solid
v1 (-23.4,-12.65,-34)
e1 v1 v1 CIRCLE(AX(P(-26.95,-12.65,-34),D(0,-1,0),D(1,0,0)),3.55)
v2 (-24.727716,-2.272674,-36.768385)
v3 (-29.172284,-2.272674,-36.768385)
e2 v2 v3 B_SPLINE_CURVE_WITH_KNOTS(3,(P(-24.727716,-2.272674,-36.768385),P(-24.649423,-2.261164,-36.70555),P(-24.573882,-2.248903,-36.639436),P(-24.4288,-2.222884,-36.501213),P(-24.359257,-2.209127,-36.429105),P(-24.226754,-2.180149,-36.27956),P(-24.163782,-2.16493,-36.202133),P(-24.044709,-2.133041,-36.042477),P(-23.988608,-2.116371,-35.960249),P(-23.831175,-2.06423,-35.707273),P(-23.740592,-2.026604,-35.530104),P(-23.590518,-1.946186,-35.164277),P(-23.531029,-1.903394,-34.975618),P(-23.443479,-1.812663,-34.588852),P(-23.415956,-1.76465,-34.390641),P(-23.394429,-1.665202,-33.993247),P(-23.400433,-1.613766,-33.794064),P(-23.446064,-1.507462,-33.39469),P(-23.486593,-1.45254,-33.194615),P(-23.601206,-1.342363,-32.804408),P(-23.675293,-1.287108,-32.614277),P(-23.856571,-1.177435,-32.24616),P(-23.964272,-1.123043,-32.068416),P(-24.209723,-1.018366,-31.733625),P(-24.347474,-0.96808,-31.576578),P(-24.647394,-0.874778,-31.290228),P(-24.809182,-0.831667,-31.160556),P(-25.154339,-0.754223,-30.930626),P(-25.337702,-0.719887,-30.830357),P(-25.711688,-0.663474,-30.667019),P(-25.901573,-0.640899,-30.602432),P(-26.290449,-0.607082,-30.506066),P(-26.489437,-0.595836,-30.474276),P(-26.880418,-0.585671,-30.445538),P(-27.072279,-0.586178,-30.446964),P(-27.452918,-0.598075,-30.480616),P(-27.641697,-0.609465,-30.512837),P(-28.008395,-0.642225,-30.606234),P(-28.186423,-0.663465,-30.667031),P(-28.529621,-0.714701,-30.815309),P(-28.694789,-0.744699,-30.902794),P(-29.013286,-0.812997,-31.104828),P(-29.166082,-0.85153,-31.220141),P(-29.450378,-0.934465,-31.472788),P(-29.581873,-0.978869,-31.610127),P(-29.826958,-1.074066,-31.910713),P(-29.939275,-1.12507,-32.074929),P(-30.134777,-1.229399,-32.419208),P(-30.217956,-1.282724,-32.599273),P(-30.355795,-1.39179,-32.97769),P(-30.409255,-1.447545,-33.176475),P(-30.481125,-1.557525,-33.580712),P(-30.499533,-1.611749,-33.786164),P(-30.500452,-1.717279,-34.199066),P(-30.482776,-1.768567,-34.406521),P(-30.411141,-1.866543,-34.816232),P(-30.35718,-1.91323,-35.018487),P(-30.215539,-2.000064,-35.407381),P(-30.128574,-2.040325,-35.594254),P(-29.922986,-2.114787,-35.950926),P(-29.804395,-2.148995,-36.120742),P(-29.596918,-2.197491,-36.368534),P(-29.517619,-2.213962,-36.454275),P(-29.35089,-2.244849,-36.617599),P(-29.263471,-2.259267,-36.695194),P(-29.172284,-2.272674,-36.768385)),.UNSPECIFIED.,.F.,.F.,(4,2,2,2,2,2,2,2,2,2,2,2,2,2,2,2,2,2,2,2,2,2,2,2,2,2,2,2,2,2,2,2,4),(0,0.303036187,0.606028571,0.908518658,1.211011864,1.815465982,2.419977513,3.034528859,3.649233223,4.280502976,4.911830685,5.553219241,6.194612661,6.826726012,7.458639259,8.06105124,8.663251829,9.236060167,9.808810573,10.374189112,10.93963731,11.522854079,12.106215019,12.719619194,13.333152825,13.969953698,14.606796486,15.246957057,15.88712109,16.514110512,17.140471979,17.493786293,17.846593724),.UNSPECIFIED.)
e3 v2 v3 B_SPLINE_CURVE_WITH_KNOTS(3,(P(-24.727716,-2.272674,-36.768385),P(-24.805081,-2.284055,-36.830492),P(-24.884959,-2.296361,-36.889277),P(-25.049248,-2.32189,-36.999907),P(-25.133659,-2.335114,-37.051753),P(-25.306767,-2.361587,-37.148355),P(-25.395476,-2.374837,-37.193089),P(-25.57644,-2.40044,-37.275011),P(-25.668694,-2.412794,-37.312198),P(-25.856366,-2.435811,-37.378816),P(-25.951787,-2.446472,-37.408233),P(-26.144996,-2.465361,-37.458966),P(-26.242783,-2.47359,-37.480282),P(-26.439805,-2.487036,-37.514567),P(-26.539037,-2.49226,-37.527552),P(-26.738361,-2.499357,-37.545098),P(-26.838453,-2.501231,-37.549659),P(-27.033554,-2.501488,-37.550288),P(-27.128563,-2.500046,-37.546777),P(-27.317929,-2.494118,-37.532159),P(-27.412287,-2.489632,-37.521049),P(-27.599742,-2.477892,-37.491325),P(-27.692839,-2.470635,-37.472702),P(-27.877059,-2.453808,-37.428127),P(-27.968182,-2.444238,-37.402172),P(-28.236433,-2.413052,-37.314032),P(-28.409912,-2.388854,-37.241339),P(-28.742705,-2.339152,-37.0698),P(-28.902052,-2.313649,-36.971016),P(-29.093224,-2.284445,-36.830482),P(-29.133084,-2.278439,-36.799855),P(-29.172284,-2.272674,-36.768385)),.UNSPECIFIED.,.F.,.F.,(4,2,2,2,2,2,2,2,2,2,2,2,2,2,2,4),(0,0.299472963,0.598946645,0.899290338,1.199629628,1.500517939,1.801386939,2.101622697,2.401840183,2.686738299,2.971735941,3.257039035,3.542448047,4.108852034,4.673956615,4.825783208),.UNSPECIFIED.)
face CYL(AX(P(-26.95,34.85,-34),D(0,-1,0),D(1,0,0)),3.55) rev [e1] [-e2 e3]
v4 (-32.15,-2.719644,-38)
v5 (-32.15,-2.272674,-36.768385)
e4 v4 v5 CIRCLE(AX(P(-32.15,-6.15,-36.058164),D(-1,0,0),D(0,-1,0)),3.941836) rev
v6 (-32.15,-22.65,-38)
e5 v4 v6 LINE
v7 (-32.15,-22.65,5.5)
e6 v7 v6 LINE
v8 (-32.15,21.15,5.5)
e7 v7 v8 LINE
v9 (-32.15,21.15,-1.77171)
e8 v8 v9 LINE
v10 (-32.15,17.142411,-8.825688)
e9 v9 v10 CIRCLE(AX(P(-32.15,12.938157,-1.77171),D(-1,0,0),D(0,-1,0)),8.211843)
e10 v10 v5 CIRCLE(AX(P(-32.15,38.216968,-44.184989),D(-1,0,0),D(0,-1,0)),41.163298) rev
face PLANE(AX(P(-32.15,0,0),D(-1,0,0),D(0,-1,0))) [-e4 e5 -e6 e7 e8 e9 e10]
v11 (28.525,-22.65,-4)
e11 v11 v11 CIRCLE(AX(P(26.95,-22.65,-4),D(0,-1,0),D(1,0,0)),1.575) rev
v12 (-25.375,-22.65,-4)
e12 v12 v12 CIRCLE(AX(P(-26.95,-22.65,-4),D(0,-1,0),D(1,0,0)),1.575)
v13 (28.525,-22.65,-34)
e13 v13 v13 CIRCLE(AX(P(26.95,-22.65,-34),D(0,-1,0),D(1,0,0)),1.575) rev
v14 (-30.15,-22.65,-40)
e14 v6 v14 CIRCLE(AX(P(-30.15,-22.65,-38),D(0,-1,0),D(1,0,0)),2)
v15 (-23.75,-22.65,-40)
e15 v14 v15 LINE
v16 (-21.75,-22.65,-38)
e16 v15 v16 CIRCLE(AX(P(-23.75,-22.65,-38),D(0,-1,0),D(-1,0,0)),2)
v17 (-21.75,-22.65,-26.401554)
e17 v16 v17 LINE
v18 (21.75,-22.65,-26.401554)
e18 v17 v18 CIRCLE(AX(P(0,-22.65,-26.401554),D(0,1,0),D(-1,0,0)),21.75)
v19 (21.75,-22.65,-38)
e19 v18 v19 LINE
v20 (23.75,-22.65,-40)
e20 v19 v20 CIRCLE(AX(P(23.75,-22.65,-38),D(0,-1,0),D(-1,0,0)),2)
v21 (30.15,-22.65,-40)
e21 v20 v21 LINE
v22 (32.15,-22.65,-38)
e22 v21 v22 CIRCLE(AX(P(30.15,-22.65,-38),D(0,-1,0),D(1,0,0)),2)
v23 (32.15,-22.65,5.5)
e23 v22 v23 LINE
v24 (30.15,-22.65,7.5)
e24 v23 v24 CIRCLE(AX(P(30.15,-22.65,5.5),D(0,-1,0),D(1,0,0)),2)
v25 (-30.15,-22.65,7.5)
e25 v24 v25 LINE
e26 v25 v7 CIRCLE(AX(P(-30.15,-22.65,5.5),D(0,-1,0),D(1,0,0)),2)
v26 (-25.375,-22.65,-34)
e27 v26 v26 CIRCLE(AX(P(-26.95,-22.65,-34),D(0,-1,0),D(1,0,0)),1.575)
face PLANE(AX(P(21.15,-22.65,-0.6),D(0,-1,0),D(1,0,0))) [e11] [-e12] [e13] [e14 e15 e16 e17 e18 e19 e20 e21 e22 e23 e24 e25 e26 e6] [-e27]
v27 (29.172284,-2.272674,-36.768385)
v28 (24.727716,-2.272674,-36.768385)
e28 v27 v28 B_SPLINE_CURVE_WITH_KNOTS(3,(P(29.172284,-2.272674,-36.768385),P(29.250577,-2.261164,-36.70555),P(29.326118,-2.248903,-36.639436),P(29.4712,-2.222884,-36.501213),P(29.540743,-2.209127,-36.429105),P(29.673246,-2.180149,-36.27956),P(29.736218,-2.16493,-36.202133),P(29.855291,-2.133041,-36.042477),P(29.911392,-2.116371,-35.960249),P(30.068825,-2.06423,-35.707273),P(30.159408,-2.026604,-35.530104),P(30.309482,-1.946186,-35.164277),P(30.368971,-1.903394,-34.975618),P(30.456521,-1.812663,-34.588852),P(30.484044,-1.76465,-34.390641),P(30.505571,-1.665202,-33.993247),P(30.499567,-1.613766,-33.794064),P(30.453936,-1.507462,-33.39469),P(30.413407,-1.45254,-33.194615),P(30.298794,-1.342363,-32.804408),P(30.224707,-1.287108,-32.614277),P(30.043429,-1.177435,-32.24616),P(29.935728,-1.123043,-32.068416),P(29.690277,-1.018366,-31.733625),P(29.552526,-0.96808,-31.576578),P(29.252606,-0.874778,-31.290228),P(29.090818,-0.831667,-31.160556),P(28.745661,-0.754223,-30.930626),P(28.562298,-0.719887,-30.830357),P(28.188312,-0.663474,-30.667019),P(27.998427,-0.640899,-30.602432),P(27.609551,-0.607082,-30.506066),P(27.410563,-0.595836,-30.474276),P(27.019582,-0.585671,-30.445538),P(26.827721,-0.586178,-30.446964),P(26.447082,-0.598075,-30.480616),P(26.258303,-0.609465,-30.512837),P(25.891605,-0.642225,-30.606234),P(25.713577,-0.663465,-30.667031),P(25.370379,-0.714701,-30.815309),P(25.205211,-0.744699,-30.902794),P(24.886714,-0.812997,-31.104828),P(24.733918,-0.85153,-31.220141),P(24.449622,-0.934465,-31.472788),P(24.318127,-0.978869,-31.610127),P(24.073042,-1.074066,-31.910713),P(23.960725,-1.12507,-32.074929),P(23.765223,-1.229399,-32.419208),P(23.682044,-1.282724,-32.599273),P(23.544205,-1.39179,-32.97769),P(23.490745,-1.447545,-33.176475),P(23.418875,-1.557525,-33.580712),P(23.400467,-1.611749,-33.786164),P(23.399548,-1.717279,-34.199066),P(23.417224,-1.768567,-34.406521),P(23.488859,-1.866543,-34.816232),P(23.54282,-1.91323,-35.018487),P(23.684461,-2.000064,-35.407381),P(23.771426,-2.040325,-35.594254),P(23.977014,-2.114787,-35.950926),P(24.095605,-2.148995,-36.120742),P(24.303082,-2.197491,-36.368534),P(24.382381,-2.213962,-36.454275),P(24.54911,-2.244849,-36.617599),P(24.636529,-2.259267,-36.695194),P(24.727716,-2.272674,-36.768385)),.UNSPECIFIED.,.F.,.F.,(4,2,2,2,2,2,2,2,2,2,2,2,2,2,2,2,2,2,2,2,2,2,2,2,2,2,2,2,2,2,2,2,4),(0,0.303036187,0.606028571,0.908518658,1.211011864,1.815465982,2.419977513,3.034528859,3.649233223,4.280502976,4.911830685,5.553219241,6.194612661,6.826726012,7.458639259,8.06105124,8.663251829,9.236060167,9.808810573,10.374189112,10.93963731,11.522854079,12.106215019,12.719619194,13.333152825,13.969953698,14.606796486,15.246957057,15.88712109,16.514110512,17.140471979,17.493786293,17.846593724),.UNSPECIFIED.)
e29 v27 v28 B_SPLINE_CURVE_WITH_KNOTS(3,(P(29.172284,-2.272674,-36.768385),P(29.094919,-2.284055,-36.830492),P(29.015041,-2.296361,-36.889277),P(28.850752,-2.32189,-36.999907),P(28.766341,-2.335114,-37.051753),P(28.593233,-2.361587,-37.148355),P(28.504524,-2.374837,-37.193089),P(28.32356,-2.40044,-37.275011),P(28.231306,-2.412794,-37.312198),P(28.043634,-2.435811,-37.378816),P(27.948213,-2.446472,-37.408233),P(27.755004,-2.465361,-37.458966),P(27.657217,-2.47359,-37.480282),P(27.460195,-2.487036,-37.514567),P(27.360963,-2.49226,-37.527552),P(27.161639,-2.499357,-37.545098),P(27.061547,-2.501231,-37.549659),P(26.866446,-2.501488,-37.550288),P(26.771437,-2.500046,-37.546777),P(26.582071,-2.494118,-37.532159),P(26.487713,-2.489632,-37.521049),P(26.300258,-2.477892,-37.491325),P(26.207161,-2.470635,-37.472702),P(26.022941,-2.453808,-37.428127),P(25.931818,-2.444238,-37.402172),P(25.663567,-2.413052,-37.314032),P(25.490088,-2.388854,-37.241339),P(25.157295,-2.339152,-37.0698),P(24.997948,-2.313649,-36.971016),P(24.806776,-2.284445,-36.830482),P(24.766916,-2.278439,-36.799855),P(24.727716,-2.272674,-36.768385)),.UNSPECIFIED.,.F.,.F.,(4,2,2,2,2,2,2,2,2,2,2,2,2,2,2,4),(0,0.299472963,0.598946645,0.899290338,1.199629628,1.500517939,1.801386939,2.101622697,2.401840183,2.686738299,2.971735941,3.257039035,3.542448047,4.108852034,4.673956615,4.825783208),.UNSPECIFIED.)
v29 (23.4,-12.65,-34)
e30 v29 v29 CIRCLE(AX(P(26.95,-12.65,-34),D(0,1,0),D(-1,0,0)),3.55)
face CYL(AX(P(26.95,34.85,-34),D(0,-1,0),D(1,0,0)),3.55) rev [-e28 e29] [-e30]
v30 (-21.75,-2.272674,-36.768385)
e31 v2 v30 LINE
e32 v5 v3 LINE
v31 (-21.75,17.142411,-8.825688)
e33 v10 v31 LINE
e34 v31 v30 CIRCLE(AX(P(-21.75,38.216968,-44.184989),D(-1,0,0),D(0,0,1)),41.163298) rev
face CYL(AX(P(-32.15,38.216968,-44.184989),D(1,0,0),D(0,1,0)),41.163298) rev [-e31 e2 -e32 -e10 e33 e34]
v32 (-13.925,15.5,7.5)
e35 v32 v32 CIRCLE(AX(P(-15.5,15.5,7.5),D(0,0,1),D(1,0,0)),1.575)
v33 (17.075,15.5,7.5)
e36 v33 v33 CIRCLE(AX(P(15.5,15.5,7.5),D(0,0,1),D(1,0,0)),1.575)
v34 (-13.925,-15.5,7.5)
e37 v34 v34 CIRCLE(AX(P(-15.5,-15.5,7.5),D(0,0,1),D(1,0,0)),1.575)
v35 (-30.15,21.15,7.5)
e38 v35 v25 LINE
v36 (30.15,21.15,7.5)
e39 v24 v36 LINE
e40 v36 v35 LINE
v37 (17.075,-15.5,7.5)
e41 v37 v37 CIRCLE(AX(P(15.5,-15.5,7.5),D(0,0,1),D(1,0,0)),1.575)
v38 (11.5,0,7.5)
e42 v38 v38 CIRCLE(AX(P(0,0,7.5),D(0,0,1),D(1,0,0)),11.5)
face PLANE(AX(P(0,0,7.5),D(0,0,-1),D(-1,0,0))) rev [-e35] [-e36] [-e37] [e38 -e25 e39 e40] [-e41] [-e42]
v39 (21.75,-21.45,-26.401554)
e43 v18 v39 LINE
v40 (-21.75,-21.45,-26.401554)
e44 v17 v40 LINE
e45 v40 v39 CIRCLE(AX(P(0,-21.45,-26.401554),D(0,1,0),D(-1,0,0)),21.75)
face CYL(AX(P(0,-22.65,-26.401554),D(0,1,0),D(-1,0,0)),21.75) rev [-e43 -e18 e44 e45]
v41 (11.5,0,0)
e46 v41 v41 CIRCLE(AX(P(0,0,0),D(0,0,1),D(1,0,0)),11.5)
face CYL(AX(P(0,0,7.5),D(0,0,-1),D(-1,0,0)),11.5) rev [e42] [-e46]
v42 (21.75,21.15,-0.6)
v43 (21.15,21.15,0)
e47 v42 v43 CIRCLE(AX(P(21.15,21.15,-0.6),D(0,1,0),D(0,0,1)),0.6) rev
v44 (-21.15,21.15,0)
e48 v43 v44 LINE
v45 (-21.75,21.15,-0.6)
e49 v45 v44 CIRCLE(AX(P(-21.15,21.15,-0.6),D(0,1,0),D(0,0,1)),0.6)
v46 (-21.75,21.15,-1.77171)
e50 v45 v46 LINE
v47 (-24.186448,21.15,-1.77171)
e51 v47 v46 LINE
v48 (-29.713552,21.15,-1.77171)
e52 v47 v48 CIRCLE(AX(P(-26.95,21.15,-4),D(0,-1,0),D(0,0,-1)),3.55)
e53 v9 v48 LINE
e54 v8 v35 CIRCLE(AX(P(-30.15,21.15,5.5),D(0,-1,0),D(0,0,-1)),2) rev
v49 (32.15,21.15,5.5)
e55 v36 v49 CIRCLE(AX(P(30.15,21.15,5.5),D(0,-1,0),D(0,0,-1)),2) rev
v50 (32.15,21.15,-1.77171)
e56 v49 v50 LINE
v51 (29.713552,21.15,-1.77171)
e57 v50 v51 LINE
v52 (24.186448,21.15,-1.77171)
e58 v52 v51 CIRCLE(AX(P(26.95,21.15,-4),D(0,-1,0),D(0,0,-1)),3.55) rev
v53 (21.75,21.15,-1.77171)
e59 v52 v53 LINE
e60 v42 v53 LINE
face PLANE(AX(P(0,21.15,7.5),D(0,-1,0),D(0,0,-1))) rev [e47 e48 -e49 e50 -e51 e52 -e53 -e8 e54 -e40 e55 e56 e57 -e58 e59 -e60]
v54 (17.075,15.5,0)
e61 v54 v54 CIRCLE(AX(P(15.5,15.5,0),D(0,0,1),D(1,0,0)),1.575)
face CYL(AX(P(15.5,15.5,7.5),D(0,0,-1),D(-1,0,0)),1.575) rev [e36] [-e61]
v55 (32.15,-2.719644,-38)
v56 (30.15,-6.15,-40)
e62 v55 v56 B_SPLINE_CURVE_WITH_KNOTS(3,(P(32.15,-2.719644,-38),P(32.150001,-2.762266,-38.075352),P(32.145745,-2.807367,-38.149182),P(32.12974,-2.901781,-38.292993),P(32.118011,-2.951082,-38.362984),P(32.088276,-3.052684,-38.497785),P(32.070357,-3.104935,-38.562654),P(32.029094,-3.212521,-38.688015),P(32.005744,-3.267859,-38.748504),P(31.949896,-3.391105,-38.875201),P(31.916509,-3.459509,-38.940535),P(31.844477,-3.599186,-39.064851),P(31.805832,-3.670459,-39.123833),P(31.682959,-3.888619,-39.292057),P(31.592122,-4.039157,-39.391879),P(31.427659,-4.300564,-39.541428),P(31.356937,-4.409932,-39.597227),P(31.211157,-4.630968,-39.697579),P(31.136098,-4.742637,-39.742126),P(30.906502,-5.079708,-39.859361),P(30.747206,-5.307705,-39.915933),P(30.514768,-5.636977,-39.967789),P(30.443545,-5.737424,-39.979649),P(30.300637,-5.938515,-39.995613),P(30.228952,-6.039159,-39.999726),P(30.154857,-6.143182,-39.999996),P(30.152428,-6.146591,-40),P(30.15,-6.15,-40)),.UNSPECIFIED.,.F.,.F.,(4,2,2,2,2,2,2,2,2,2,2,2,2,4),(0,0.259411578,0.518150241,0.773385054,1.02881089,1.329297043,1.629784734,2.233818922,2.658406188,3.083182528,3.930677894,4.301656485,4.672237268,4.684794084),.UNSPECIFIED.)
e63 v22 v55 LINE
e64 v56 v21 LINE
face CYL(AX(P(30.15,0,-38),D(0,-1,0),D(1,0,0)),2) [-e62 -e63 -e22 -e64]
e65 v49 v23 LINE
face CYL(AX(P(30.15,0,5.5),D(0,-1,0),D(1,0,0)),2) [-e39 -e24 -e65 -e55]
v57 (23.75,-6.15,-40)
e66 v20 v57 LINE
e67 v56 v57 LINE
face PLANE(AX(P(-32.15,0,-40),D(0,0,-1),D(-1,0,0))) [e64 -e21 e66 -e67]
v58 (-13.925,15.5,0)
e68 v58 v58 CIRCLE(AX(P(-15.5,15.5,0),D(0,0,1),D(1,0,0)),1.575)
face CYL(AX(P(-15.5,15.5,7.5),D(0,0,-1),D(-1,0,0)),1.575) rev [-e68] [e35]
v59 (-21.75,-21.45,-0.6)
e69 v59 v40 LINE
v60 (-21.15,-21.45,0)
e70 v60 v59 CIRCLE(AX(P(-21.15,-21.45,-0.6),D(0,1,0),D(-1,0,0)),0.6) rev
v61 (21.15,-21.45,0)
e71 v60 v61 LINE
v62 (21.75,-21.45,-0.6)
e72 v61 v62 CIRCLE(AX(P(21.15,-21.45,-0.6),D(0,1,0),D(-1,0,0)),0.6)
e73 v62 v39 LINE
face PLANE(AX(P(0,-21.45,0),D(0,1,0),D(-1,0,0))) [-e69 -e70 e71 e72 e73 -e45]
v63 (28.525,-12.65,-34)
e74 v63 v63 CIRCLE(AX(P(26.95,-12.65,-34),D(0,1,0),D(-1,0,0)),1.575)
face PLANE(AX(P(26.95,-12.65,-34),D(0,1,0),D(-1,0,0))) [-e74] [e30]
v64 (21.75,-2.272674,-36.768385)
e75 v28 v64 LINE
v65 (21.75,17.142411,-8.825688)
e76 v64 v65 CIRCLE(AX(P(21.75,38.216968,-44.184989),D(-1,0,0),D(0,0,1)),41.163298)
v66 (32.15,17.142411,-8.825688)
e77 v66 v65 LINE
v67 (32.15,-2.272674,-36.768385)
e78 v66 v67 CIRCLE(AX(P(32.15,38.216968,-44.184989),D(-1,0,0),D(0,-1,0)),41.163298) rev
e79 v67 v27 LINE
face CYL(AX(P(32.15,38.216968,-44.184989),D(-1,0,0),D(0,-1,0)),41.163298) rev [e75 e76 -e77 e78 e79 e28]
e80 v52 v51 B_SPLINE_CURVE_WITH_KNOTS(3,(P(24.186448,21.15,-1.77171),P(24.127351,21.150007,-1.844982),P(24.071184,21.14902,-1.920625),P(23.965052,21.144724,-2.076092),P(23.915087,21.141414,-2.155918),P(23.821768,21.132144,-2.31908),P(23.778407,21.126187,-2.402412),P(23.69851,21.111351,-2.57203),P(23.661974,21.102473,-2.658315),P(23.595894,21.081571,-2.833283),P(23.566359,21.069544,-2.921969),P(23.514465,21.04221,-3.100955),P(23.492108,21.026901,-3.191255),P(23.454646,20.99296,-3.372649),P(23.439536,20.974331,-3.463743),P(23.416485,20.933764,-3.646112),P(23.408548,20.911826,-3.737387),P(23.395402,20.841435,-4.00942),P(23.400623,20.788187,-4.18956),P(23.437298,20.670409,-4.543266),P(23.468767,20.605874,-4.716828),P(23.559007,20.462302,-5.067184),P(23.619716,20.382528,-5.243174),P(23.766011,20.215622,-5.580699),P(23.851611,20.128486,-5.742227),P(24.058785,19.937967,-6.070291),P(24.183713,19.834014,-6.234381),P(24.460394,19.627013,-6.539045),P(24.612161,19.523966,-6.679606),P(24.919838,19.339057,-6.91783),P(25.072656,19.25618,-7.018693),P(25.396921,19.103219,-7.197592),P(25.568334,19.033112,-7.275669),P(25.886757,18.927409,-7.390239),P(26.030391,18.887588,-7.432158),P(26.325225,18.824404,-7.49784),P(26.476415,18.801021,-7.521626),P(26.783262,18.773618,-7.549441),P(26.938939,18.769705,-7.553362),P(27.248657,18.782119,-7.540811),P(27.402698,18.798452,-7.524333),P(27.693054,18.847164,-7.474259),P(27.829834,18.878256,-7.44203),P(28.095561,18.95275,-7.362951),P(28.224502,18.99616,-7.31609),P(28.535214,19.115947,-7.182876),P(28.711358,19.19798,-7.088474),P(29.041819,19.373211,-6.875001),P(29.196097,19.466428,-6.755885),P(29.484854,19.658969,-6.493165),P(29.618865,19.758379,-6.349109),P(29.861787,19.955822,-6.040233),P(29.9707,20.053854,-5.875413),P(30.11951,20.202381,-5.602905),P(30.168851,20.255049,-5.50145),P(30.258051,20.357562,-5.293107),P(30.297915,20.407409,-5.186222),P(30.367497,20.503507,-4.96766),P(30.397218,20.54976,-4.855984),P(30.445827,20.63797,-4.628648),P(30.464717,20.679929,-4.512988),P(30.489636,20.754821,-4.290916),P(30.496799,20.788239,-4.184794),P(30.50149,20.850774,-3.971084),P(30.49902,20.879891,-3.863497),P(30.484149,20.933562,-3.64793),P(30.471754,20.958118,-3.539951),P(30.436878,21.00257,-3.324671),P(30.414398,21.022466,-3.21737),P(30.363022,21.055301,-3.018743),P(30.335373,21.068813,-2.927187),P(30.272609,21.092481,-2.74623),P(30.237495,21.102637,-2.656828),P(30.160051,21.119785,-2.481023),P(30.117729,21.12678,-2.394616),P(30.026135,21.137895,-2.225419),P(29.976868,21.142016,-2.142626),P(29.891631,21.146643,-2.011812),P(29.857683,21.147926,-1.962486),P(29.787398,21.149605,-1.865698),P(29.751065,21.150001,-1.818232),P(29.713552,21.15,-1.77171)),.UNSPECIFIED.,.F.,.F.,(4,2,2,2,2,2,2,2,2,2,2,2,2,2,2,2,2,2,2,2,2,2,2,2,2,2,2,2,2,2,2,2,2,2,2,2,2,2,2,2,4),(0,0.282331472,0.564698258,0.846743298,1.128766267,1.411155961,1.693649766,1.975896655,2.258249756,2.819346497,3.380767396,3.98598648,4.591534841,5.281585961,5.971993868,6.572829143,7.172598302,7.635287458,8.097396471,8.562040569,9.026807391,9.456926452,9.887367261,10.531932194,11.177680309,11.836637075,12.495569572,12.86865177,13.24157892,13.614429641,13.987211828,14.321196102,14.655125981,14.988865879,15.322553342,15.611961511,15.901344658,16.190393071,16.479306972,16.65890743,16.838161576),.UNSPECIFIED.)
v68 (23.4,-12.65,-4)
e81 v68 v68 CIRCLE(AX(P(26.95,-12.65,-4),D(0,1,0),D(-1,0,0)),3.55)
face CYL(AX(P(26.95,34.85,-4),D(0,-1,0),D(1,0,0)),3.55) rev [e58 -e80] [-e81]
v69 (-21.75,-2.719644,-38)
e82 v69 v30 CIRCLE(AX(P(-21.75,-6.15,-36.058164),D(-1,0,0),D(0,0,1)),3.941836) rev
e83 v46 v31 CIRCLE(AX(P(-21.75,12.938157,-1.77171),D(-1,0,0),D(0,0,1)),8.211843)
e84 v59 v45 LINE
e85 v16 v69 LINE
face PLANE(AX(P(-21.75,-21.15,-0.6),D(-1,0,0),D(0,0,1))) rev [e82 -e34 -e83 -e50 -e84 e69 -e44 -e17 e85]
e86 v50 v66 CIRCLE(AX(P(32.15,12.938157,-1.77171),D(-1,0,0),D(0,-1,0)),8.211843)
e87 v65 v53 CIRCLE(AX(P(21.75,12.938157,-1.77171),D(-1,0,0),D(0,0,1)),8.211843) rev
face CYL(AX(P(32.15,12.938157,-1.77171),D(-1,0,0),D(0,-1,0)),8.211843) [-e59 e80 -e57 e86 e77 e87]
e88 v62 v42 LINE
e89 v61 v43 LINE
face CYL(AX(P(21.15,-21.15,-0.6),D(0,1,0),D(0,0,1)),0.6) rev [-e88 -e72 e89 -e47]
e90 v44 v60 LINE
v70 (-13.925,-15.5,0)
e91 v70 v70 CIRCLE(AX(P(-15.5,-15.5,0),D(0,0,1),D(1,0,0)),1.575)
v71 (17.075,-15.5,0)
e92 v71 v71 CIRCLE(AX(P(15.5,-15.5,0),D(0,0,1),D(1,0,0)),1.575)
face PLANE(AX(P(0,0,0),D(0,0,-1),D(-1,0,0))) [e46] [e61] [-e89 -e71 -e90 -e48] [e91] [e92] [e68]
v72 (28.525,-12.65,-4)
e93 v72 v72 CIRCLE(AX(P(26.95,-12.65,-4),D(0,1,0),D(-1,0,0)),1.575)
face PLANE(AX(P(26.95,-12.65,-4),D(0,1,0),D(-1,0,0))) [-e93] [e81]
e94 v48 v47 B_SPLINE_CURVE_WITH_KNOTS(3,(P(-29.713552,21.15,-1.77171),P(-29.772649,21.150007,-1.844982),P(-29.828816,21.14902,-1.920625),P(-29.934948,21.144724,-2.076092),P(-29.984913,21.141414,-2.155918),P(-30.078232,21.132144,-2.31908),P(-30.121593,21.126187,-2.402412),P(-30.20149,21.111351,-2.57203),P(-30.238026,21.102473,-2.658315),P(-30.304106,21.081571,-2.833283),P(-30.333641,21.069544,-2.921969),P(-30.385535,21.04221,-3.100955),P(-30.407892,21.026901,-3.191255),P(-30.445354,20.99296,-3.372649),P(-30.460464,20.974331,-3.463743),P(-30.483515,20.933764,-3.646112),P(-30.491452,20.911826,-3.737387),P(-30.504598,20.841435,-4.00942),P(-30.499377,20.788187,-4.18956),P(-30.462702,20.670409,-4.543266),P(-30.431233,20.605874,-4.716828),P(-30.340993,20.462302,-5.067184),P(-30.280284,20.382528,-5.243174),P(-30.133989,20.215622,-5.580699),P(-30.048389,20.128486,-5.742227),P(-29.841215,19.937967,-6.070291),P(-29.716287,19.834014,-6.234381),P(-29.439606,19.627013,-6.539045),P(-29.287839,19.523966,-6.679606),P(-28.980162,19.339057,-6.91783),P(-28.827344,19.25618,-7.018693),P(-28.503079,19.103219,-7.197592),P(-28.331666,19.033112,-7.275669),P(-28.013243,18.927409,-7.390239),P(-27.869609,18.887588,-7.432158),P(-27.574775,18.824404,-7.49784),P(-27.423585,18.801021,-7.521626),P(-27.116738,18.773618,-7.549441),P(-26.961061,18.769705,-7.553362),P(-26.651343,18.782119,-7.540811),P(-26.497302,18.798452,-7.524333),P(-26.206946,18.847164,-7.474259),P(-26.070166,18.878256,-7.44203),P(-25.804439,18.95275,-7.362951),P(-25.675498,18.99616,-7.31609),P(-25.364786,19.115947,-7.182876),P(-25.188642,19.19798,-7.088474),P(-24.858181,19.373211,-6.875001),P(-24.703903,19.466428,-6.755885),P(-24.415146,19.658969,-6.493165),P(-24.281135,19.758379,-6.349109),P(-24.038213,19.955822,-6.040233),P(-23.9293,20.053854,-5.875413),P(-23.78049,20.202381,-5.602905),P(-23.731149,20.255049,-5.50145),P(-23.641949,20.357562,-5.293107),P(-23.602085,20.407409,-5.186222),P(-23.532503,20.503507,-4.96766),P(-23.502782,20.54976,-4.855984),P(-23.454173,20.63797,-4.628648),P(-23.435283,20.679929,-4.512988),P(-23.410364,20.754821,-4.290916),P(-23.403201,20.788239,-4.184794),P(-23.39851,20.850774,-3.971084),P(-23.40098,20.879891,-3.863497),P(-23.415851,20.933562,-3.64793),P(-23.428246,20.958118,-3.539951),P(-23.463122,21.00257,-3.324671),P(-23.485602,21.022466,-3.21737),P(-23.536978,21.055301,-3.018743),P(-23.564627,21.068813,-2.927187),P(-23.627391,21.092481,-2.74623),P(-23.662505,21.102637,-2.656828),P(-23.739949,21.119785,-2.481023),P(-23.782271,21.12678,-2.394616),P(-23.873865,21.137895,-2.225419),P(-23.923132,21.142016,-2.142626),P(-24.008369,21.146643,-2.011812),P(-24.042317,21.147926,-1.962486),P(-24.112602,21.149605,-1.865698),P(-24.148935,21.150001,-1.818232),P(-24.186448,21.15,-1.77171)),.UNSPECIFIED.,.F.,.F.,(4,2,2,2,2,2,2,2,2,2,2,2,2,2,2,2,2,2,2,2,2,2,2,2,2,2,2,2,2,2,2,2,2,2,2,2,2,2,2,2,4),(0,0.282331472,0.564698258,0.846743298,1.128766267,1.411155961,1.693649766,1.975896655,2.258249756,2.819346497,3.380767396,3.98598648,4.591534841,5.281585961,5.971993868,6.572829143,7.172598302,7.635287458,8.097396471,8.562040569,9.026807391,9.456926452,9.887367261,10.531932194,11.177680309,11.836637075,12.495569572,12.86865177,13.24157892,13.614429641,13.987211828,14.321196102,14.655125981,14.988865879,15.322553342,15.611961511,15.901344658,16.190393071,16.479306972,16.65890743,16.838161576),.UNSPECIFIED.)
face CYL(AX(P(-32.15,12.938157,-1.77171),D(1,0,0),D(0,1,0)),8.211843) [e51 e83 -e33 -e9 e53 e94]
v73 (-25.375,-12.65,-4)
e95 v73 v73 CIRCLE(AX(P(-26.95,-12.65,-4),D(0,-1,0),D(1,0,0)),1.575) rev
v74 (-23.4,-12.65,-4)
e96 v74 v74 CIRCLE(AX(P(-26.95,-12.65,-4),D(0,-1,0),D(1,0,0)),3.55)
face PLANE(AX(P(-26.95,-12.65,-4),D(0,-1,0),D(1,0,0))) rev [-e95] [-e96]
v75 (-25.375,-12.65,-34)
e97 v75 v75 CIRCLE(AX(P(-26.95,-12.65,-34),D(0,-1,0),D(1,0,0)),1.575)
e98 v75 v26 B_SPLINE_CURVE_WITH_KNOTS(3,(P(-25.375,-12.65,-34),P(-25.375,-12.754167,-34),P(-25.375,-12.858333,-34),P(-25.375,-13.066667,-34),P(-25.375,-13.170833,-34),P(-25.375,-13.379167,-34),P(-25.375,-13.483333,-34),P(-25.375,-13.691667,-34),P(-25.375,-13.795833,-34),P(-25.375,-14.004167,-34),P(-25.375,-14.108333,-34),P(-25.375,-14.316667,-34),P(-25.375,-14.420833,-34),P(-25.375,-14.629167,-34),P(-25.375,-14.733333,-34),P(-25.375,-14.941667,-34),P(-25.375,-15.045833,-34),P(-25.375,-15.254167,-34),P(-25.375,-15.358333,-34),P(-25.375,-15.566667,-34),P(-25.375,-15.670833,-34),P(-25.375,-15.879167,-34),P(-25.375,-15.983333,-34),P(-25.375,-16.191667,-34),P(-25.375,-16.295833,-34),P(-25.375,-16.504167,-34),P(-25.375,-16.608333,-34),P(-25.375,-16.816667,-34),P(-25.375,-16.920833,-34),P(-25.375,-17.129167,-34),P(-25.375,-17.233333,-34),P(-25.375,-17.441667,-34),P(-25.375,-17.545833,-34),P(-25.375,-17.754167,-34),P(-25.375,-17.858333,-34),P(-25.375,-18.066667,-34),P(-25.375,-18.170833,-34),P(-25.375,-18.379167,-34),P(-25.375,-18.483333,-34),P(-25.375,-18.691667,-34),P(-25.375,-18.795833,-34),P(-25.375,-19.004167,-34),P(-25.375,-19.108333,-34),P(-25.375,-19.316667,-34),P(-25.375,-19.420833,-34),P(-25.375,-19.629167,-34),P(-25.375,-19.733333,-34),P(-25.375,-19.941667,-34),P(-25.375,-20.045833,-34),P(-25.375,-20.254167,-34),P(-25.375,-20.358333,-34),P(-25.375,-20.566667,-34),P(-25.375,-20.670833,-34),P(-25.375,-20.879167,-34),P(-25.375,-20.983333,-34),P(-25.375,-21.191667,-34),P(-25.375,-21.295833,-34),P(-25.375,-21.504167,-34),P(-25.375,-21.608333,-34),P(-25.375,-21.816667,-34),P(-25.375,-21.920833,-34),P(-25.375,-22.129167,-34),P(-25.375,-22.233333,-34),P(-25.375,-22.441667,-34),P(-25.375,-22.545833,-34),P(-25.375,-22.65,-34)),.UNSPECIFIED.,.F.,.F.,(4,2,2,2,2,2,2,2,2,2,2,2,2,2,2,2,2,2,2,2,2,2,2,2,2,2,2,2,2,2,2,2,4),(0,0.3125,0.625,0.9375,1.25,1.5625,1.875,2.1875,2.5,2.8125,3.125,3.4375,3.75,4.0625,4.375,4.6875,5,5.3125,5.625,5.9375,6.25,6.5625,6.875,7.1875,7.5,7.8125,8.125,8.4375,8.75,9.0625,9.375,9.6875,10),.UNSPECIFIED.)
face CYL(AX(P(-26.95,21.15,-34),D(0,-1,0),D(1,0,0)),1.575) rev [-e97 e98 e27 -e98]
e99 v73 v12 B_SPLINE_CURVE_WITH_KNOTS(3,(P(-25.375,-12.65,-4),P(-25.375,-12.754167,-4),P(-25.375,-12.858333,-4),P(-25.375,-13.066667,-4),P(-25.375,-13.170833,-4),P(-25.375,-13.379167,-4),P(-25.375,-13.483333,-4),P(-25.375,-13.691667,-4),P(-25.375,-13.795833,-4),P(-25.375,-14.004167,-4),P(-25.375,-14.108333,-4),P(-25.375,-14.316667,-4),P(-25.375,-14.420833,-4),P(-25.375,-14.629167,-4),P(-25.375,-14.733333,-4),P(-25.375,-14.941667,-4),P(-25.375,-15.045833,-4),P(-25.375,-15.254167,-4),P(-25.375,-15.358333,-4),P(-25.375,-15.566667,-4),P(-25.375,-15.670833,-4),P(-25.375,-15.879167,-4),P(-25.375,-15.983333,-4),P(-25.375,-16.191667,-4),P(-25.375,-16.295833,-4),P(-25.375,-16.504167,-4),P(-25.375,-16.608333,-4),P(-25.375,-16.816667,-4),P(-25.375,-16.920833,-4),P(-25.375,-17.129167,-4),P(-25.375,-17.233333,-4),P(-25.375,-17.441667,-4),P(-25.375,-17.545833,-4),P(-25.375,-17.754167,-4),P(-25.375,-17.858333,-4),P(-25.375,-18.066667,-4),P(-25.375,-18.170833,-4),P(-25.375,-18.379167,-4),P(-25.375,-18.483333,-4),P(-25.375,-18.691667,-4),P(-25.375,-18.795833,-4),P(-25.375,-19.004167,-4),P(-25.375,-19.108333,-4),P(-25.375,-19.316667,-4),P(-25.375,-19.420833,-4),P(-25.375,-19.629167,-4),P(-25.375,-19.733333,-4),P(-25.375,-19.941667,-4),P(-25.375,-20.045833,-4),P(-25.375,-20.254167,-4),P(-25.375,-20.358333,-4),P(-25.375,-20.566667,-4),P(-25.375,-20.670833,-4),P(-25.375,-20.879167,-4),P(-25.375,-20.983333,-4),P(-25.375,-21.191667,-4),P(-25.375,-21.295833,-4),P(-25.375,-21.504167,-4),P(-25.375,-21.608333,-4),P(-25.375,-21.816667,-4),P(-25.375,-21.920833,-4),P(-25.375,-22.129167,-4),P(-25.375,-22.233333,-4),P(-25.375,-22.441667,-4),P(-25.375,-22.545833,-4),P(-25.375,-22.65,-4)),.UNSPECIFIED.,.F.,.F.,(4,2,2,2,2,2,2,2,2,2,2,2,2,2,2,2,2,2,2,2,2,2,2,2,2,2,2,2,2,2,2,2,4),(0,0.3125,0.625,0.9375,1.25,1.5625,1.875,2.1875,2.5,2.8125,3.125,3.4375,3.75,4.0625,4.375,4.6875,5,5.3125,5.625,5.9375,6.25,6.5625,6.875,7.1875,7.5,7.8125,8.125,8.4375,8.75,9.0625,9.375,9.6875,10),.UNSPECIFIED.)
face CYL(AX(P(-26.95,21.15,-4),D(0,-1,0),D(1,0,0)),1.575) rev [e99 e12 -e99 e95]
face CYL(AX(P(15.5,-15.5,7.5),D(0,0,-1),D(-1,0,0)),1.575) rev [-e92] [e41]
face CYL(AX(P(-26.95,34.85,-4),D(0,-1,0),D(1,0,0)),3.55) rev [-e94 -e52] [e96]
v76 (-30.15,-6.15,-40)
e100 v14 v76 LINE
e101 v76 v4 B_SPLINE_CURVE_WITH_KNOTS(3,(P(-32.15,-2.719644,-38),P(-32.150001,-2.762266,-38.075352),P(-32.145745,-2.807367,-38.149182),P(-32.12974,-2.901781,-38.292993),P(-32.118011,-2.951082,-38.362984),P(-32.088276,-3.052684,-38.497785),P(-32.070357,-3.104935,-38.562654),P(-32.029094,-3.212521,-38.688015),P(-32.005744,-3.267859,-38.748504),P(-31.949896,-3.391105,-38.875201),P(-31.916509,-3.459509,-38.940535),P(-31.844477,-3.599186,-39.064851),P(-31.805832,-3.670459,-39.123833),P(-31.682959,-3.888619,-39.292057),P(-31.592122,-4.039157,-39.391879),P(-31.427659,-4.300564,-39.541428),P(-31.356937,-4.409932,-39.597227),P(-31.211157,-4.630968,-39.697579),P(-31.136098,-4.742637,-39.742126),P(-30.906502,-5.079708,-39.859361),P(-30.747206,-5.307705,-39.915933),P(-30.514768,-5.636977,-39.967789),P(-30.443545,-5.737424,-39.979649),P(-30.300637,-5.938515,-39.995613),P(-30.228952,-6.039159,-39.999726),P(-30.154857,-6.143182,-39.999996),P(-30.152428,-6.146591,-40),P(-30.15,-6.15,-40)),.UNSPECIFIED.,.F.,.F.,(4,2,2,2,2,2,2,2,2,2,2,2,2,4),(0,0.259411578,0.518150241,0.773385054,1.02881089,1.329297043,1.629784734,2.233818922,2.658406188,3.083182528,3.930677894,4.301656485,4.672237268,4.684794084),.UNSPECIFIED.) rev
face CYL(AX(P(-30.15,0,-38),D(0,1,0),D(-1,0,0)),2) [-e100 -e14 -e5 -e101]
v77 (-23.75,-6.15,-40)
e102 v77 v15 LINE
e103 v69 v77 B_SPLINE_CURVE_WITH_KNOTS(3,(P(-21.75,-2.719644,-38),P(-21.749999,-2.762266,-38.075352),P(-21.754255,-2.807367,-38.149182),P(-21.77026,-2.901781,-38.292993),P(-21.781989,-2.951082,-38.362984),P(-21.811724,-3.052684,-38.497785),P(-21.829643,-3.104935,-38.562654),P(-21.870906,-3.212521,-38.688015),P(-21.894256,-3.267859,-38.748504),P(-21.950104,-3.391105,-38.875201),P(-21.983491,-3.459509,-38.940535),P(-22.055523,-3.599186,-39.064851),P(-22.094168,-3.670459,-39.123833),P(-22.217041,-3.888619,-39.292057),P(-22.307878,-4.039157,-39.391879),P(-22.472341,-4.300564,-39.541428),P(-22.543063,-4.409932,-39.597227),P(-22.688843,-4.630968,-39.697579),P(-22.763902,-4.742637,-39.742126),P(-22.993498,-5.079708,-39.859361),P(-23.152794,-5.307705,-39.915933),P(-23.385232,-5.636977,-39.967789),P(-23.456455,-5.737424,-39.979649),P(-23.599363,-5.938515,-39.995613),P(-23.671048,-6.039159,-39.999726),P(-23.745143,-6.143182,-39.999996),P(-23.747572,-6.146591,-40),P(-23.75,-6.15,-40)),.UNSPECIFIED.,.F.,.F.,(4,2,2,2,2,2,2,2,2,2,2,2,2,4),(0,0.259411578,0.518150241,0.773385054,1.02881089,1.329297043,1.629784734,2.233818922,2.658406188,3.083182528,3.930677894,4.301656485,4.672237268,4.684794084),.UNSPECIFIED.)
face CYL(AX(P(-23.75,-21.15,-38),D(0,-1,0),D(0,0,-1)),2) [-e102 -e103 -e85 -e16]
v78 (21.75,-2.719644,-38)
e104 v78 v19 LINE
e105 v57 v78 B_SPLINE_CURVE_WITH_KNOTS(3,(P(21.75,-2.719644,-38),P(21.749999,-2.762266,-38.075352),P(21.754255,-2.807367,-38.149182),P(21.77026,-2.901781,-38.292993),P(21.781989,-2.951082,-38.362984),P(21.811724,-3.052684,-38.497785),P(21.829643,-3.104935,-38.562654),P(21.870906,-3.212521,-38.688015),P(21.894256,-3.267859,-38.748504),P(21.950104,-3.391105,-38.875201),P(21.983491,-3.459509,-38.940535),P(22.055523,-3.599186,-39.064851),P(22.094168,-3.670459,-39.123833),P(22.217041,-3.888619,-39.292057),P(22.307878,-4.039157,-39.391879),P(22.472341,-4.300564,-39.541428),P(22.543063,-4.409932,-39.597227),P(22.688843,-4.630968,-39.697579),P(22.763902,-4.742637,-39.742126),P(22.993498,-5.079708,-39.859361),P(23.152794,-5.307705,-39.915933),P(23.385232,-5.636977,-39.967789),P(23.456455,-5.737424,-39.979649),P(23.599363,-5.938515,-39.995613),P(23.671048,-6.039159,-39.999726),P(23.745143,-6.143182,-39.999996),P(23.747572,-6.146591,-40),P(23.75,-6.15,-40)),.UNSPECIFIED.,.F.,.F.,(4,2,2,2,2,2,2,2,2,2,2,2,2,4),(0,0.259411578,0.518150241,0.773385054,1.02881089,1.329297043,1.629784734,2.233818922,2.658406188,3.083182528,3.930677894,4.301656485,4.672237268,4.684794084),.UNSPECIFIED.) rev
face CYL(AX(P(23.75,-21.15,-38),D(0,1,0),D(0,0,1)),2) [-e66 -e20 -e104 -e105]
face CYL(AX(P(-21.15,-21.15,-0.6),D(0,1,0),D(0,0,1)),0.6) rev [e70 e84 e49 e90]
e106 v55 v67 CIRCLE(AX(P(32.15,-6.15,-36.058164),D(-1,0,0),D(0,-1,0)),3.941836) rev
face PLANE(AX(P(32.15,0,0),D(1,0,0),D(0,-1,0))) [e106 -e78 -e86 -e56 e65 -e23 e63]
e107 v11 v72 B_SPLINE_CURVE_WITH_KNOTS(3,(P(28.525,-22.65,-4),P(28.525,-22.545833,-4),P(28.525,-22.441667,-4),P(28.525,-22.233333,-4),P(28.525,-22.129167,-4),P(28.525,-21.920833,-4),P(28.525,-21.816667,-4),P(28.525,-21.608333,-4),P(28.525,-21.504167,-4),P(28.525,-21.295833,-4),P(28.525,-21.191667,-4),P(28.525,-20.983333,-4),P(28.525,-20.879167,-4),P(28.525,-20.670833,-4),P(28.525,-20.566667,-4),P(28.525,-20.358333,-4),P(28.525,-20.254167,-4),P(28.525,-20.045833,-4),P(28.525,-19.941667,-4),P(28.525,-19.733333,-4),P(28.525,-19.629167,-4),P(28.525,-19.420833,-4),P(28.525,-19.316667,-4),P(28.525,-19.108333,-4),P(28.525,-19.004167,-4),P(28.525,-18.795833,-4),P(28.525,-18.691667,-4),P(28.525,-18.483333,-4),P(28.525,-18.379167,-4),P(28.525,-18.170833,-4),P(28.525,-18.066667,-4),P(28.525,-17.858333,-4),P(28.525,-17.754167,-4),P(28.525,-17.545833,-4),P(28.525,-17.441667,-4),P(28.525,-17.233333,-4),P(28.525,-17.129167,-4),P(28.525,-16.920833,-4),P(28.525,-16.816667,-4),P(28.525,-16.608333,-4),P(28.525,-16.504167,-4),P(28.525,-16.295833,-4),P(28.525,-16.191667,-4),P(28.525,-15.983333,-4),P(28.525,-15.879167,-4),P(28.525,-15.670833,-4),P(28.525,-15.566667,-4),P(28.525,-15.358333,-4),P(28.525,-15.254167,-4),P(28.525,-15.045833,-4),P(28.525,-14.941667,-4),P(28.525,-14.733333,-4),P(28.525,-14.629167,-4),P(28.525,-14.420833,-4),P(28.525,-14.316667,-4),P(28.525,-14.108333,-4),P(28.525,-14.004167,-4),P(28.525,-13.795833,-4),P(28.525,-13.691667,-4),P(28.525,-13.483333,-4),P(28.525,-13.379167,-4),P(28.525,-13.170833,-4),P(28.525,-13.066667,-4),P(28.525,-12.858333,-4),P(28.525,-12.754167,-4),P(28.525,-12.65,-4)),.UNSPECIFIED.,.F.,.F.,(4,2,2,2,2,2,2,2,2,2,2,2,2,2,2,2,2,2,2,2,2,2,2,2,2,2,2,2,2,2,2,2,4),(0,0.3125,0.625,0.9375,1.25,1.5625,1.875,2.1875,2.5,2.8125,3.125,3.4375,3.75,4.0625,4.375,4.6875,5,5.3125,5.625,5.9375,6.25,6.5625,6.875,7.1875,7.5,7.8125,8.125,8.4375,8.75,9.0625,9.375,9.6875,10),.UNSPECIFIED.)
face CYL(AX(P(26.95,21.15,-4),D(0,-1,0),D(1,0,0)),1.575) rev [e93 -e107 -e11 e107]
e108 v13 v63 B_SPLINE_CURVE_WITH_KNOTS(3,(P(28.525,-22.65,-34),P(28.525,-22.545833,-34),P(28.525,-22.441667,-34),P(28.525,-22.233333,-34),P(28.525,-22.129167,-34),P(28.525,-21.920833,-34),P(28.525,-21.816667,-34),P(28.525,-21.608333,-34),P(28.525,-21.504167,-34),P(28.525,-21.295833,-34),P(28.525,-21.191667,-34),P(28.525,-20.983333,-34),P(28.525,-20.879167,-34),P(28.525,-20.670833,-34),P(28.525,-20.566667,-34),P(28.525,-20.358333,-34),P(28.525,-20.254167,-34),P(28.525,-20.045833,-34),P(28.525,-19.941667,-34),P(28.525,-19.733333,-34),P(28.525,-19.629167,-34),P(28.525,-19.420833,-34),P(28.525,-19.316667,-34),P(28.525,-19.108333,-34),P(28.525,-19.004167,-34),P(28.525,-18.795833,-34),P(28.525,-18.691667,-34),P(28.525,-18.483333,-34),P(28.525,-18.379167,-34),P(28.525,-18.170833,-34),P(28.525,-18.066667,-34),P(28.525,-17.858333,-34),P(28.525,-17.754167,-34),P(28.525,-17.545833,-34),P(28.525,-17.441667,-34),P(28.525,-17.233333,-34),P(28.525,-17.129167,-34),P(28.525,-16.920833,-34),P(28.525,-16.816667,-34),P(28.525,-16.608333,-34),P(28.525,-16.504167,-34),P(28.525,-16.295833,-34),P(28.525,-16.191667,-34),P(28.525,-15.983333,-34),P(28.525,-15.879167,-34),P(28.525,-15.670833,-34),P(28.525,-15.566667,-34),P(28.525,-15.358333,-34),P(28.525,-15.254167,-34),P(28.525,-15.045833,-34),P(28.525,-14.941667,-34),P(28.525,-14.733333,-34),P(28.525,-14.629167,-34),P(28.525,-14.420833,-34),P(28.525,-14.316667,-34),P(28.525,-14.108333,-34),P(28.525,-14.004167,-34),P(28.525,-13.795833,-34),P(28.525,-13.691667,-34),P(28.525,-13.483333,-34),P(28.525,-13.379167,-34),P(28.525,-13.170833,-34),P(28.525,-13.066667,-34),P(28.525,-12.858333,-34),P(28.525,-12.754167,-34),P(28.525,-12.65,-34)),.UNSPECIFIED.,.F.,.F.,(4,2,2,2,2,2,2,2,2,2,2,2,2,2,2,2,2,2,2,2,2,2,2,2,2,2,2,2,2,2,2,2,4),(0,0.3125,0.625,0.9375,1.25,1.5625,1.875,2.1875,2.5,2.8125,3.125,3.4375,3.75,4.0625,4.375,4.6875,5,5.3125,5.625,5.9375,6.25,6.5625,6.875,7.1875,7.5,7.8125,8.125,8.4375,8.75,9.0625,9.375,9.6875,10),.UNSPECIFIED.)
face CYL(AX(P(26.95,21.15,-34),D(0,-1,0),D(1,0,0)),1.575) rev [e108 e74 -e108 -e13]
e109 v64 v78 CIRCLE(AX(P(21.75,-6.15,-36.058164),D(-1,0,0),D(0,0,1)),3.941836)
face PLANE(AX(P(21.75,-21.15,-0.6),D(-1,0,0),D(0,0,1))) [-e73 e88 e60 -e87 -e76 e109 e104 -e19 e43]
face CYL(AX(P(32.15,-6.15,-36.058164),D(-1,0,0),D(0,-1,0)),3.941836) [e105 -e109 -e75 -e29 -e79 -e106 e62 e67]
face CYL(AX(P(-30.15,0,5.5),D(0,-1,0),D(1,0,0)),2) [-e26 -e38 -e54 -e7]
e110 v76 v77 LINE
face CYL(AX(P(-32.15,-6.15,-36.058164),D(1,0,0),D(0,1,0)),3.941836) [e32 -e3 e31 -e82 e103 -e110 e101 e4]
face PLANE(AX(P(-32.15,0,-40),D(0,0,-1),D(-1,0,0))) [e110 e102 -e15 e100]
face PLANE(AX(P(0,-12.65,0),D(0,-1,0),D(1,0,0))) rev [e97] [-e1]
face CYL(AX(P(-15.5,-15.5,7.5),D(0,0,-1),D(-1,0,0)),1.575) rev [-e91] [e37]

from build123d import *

# Parameters (mm, degrees)
MAIN_FACE_R                    = 1.5749999999999995
MAIN_FACE_R_2                  = 1.5750000000000013
MAIN_FACE_R_3                  = 11.5
MAINFACE_DEPTH                 = 7.5
SKETCH2_W                      = 7.500000000000001
SKETCH2_H                      = 42.30000000000015
SIDEPROFILE_DEPTH              = 11
NON_INTERFERING_FILLET_DEPTH   = 67.5049810164623
BASECLEARANCE_DEPTH            = 1.5
GROUDINGBOLTHOLES_DEPTH        = 68.46897435117894
GROUDINGBOLTHOLES_DEPTH_BACK   = 68.46897435117894
SKETCH5_R                      = 1.5749999999999995
BOLTACCESSHOLES_START          = -10
SKETCH5_3_R                    = 3.55
SKETCH5_3_R_2                  = 1.5749999999999995
SKETCH5_3_R_3                  = 3.5500000000000007
BOLTACCESSHOLES_DEPTH          = 47.50000000000001
HAPPYPRINTERCURVES_R           = 2
SKETCH6_W                      = 48.78690945060761
SKETCH6_H                      = 41.74981882727384
BASEPLATE_DEPTH                = 1.2
SUPPORTTORSIONBUTBREATHE_DEPTH = 67.6961957157231


with BuildPart() as part:
    # Main Face → MainFace (new body)
    with BuildSketch(Plane.XY):
        Polygon((0, 21.150000000000077), (21.150000000000077, 21.150000000000077), (21.150000000000087, 7.98e-14), (21.150000000000507, -21.149999999999572), (8.381e-14, -21.149999999999928), (-21.149999999999924, -21.149999999999928), (-21.149999999999995, -2.69e-15), (-21.149999999999856, 21.150000000000222), align=None)
        with Locations((15.499999999999996, 15.5)):
            Circle(MAIN_FACE_R, mode=Mode.SUBTRACT)
        with Locations((15.500000000000005, -15.500000000000002)):
            Circle(MAIN_FACE_R_2, mode=Mode.SUBTRACT)
        with Locations((-15.499999999999998, -15.500000000000012)):
            Circle(MAIN_FACE_R, mode=Mode.SUBTRACT)
        with Locations((-15.50000000000001, 15.49999999999999)):
            Circle(MAIN_FACE_R, mode=Mode.SUBTRACT)
        Circle(MAIN_FACE_R_3, mode=Mode.SUBTRACT)
    extrude(amount=MAINFACE_DEPTH)

    # Sketch2 → SideProfile (add)
    with BuildSketch(Plane.ZY.offset(21.149999999999995)):
        with Locations((3.7500000000000004, 2.1849e-13)):
            Rectangle(SKETCH2_W, SKETCH2_H)
        with BuildLine():
            Line((0, -21.14999999999986), (0, 21.150000000000293))
            Line((0, 21.150000000000293), (-1.771709500841494, 21.150000000000293))
            ThreePointArc((-1.7717095008414934, 21.150000000000297), (-5.828166751938932, 20.078151362319375), (-8.825687949345335, 17.14241097816094))
            ThreePointArc((-8.82568794934533, 17.142410978160935), (-20.697100679367818, 4.412586379453849), (-36.76838475660053, -2.2726737223876654))
            ThreePointArc((-36.76838475660055, -2.2726737223876654), (-39.086170348891756, -3.6262628829235943), (-40, -6.149999999999864))
            Line((-40, -6.149999999999864), (-40, -21.149999999999864))
            Line((-40, -21.149999999999864), (0, -21.149999999999856))
        make_face()
    sideprofile = extrude(amount=SIDEPROFILE_DEPTH)

    # Sketch3 → Non-interfering fillet (cut, symmetric)
    with BuildSketch(Plane(origin=(0, 21.150000000000077, 0), x_dir=(1, 0, 0), z_dir=(0, 1, 0))):
        with BuildLine():
            Line((-21.75000000000007, 0.5999999999999999), (-21.750000000000068, 41.938133152744264))
            Line((-21.750000000000068, 41.938133152744264), (-16.932175207311897, 41.938133152744264))
            Line((-16.932175207311897, 41.938133152744264), (-16.932175207311897, 2.9783080433489855))
            Line((-16.932175207311897, 2.9783080433489855), (-21.149999999999856, 0))
            ThreePointArc((-21.149999999999856, 0), (-21.574264068711923, 0.17573593128799603), (-21.75000000000007, 0.5999999999999999))
        make_face()
    non_interfering_fillet = extrude(amount=NON_INTERFERING_FILLET_DEPTH, both=True, mode=Mode.SUBTRACT)

    # Mirror1: SideProfile, Non-interfering fillet across plane
    add(sideprofile.mirror(Plane(origin=(0, 0, 0), x_dir=(0, 0, 1), z_dir=(1, 0, 0))))
    add(non_interfering_fillet.mirror(Plane(origin=(0, 0, 0), x_dir=(0, 0, 1), z_dir=(1, 0, 0))), mode=Mode.SUBTRACT)

    # Sketch4 → BaseClearance (add)
    with BuildSketch(Plane.XZ.offset(21.149999999999928)):
        with BuildLine():
            Line((21.749999999999716, -0.5999999999999999), (21.749999999999712, -39.99999999999999))
            Line((21.749999999999712, -39.99999999999999), (32.149999999999565, -40))
            Line((32.149999999999565, -40), (32.149999999999565, 7.5))
            Line((32.149999999999565, 7.5), (-32.150000000000276, 7.5))
            Line((-32.150000000000276, 7.5), (-32.150000000000276, -40))
            Line((-32.150000000000276, -40), (-21.750000000000433, -40))
            Line((-21.750000000000433, -40), (-21.75000000000043, -0.5999999999999998))
            ThreePointArc((-21.75000000000043, -0.5999999999999998), (-21.574264068712278, -0.17573593128799736), (-21.150000000000215, 0))
            Line((-21.150000000000215, 0), (21.149999999999498, 1.73e-15))
            ThreePointArc((21.149999999999498, 1.73e-15), (21.574264068711567, -0.17573593128799248), (21.749999999999716, -0.5999999999999999))
        make_face()
    extrude(amount=BASECLEARANCE_DEPTH)

    # Sketch5 → GroudingBoltHoles (cut, two sides: drawn at the far end of the back side and taken through both)
    with BuildSketch(Plane.XZ.offset(22.64999999999993).offset(-GROUDINGBOLTHOLES_DEPTH_BACK)):
        with Locations((-26.95000000000035, -4.0000000000000036)):
            Circle(SKETCH5_R)
        with Locations((-26.950000000000344, -34)):
            Circle(SKETCH5_R)
        with Locations((26.95000000000035, -33.99999999999999)):
            Circle(SKETCH5_R)
        with Locations((26.95000000000035, -3.9999999999999964)):
            Circle(SKETCH5_R)
    extrude(amount=GROUDINGBOLTHOLES_DEPTH + GROUDINGBOLTHOLES_DEPTH_BACK, mode=Mode.SUBTRACT)

    # Sketch5<3> → BoltAccessHoles (cut)
    # profile 1 of 4: a face of its own
    with BuildSketch(Plane.XZ.offset(22.64999999999993).offset(BOLTACCESSHOLES_START)):
        with Locations((-26.950000000000344, -34)):
            Circle(SKETCH5_3_R)
        with Locations((-26.950000000000344, -34)):
            Circle(SKETCH5_3_R_2, mode=Mode.SUBTRACT)
    # profile 2 of 4: a face of its own
    with BuildSketch(Plane.XZ.offset(22.64999999999993).offset(BOLTACCESSHOLES_START)):
        with Locations((-26.95000000000035, -4.0000000000000036)):
            Circle(SKETCH5_3_R_3)
    # profile 3 of 4: a face of its own
    with BuildSketch(Plane.XZ.offset(22.64999999999993).offset(BOLTACCESSHOLES_START)):
        with Locations(Location((26.95000000000035, -3.9999999999999964, 0), (0, 0, 38.879713196))):
            Circle(SKETCH5_3_R_3)
    # profile 4 of 4: a face of its own
    with BuildSketch(Plane.XZ.offset(22.64999999999993).offset(BOLTACCESSHOLES_START)):
        with Locations(Location((26.95000000000035, -33.99999999999999, 0), (0, 0, 308.755289776))):
            Circle(SKETCH5_3_R)
    extrude(amount=-BOLTACCESSHOLES_DEPTH, mode=Mode.SUBTRACT)

    # HappyPrinterCurves
    # the kernel refuses this fillet: 2 mm, written as the material it takes off along each edge
    with BuildSketch(Plane(origin=(32.1499999999999, -27.649999999999395, -40), x_dir=(0, 0, 1), z_dir=(1.29e-15, 1, 0))) as happyprintercurves_piece_1:
        with BuildLine():
            CenterArc((HAPPYPRINTERCURVES_R, -HAPPYPRINTERCURVES_R), HAPPYPRINTERCURVES_R, 90, 90)
            Line((0, -HAPPYPRINTERCURVES_R), (0, 0))
            Line((0, 0), (HAPPYPRINTERCURVES_R, 0))
        make_face()
    extrude(amount=26.49999999999942, mode=Mode.SUBTRACT)
    with BuildSketch(Plane(origin=(21.750000000000068, -1.1499999999999382, -40), x_dir=(0, 4.3e-16, 1), z_dir=(1.72e-15, -1, 4.3e-16))) as happyprintercurves_piece_2:
        with BuildLine():
            CenterArc((HAPPYPRINTERCURVES_R, -HAPPYPRINTERCURVES_R), HAPPYPRINTERCURVES_R, 90, 90)
            Line((0, -HAPPYPRINTERCURVES_R), (0, 0))
            Line((0, 0), (HAPPYPRINTERCURVES_R, 0))
        make_face()
    extrude(amount=26.49999999999963, mode=Mode.SUBTRACT)
    with BuildSketch(Plane(origin=(-32.149999999999984, -1.1499999999999737, -40), x_dir=(0, 0, 1), z_dir=(4.74e-15, -1, 0))) as happyprintercurves_piece_3:
        with BuildLine():
            CenterArc((HAPPYPRINTERCURVES_R, -HAPPYPRINTERCURVES_R), HAPPYPRINTERCURVES_R, 90, 90)
            Line((0, -HAPPYPRINTERCURVES_R), (0, 0))
            Line((0, 0), (HAPPYPRINTERCURVES_R, 0))
        make_face()
    extrude(amount=26.500000000000487, mode=Mode.SUBTRACT)
    with BuildSketch(Plane(origin=(-32.1499999999999, -27.65000000000046, 7.5), x_dir=(1, 3.89e-15, 0), z_dir=(-3.89e-15, 1, 0))) as happyprintercurves_piece_4:
        with BuildLine():
            CenterArc((HAPPYPRINTERCURVES_R, HAPPYPRINTERCURVES_R), HAPPYPRINTERCURVES_R, 180, 90)
            Line((0, HAPPYPRINTERCURVES_R), (0, 0))
            Line((0, 0), (HAPPYPRINTERCURVES_R, 0))
        make_face()
    extrude(amount=53.800000000000644, mode=Mode.SUBTRACT)
    with BuildSketch(Plane(origin=(-21.750000000000068, -27.65000000000029, -40), x_dir=(0, 0, 1), z_dir=(-1.08e-15, 1, 0))) as happyprintercurves_piece_5:
        with BuildLine():
            CenterArc((HAPPYPRINTERCURVES_R, -HAPPYPRINTERCURVES_R), HAPPYPRINTERCURVES_R, 90, 90)
            Line((0, -HAPPYPRINTERCURVES_R), (0, 0))
            Line((0, 0), (HAPPYPRINTERCURVES_R, 0))
        make_face()
    extrude(amount=26.500000000000348, mode=Mode.SUBTRACT)
    with BuildSketch(Plane(origin=(32.150000000000084, 26.150000000000183, 7.5), x_dir=(0, 0, -1), z_dir=(-2.6e-15, -1, 0))) as happyprintercurves_piece_6:
        with BuildLine():
            CenterArc((HAPPYPRINTERCURVES_R, -HAPPYPRINTERCURVES_R), HAPPYPRINTERCURVES_R, 90, 90)
            Line((0, -HAPPYPRINTERCURVES_R), (0, 0))
            Line((0, 0), (HAPPYPRINTERCURVES_R, 0))
        make_face()
    extrude(amount=53.79999999999958, mode=Mode.SUBTRACT)

    # Sketch6 → BasePlate (add)
    with BuildSketch(Plane.XZ.offset(22.64999999999993)):
        with Locations((-0.09860427356243306, -19.12509058636308)):
            Rectangle(SKETCH6_W, SKETCH6_H)
    extrude(amount=-BASEPLATE_DEPTH)

    # Sketch7 → SupportTorsionButBreathe (cut, through all)
    with BuildSketch(Plane(origin=(3.5542e-13, -21.449999999999932, 0), x_dir=(1, 1.657e-14, 0), z_dir=(-1.657e-14, 1, 0))):
        with BuildLine():
            Line((21.75000000000003, 36.768384756600554), (21.74999999999979, 26.401553875860724))
            ThreePointArc((21.74999999999979, 26.401553875860724), (-4e-15, 4.651553875860934), (-21.74999999999979, 26.401553875860724))
            Line((-21.74999999999979, 26.401553875860724), (-21.750000000000107, 36.76838475660055))
            Line((-21.750000000000107, 36.76838475660055), (-21.750000000000114, 38))
            ThreePointArc((-21.750000000000114, 38), (-22.335786437627018, 39.41421356237322), (-23.750000000000167, 40))
            Line((-23.750000000000167, 40), (-23.750000000000167, 46.1872525671472))
            Line((-23.750000000000167, 46.1872525671472), (23.749999999999964, 46.1872525671472))
            Line((23.749999999999964, 46.1872525671472), (23.749999999999964, 40))
            ThreePointArc((23.749999999999964, 40), (22.33578643762671, 39.414213562373185), (21.75000000000002, 38))
            Line((21.75000000000002, 38), (21.75000000000003, 36.768384756600554))
        make_face()
    extrude(amount=-SUPPORTTORSIONBUTBREATHE_DEPTH, mode=Mode.SUBTRACT)


solid = part.part
